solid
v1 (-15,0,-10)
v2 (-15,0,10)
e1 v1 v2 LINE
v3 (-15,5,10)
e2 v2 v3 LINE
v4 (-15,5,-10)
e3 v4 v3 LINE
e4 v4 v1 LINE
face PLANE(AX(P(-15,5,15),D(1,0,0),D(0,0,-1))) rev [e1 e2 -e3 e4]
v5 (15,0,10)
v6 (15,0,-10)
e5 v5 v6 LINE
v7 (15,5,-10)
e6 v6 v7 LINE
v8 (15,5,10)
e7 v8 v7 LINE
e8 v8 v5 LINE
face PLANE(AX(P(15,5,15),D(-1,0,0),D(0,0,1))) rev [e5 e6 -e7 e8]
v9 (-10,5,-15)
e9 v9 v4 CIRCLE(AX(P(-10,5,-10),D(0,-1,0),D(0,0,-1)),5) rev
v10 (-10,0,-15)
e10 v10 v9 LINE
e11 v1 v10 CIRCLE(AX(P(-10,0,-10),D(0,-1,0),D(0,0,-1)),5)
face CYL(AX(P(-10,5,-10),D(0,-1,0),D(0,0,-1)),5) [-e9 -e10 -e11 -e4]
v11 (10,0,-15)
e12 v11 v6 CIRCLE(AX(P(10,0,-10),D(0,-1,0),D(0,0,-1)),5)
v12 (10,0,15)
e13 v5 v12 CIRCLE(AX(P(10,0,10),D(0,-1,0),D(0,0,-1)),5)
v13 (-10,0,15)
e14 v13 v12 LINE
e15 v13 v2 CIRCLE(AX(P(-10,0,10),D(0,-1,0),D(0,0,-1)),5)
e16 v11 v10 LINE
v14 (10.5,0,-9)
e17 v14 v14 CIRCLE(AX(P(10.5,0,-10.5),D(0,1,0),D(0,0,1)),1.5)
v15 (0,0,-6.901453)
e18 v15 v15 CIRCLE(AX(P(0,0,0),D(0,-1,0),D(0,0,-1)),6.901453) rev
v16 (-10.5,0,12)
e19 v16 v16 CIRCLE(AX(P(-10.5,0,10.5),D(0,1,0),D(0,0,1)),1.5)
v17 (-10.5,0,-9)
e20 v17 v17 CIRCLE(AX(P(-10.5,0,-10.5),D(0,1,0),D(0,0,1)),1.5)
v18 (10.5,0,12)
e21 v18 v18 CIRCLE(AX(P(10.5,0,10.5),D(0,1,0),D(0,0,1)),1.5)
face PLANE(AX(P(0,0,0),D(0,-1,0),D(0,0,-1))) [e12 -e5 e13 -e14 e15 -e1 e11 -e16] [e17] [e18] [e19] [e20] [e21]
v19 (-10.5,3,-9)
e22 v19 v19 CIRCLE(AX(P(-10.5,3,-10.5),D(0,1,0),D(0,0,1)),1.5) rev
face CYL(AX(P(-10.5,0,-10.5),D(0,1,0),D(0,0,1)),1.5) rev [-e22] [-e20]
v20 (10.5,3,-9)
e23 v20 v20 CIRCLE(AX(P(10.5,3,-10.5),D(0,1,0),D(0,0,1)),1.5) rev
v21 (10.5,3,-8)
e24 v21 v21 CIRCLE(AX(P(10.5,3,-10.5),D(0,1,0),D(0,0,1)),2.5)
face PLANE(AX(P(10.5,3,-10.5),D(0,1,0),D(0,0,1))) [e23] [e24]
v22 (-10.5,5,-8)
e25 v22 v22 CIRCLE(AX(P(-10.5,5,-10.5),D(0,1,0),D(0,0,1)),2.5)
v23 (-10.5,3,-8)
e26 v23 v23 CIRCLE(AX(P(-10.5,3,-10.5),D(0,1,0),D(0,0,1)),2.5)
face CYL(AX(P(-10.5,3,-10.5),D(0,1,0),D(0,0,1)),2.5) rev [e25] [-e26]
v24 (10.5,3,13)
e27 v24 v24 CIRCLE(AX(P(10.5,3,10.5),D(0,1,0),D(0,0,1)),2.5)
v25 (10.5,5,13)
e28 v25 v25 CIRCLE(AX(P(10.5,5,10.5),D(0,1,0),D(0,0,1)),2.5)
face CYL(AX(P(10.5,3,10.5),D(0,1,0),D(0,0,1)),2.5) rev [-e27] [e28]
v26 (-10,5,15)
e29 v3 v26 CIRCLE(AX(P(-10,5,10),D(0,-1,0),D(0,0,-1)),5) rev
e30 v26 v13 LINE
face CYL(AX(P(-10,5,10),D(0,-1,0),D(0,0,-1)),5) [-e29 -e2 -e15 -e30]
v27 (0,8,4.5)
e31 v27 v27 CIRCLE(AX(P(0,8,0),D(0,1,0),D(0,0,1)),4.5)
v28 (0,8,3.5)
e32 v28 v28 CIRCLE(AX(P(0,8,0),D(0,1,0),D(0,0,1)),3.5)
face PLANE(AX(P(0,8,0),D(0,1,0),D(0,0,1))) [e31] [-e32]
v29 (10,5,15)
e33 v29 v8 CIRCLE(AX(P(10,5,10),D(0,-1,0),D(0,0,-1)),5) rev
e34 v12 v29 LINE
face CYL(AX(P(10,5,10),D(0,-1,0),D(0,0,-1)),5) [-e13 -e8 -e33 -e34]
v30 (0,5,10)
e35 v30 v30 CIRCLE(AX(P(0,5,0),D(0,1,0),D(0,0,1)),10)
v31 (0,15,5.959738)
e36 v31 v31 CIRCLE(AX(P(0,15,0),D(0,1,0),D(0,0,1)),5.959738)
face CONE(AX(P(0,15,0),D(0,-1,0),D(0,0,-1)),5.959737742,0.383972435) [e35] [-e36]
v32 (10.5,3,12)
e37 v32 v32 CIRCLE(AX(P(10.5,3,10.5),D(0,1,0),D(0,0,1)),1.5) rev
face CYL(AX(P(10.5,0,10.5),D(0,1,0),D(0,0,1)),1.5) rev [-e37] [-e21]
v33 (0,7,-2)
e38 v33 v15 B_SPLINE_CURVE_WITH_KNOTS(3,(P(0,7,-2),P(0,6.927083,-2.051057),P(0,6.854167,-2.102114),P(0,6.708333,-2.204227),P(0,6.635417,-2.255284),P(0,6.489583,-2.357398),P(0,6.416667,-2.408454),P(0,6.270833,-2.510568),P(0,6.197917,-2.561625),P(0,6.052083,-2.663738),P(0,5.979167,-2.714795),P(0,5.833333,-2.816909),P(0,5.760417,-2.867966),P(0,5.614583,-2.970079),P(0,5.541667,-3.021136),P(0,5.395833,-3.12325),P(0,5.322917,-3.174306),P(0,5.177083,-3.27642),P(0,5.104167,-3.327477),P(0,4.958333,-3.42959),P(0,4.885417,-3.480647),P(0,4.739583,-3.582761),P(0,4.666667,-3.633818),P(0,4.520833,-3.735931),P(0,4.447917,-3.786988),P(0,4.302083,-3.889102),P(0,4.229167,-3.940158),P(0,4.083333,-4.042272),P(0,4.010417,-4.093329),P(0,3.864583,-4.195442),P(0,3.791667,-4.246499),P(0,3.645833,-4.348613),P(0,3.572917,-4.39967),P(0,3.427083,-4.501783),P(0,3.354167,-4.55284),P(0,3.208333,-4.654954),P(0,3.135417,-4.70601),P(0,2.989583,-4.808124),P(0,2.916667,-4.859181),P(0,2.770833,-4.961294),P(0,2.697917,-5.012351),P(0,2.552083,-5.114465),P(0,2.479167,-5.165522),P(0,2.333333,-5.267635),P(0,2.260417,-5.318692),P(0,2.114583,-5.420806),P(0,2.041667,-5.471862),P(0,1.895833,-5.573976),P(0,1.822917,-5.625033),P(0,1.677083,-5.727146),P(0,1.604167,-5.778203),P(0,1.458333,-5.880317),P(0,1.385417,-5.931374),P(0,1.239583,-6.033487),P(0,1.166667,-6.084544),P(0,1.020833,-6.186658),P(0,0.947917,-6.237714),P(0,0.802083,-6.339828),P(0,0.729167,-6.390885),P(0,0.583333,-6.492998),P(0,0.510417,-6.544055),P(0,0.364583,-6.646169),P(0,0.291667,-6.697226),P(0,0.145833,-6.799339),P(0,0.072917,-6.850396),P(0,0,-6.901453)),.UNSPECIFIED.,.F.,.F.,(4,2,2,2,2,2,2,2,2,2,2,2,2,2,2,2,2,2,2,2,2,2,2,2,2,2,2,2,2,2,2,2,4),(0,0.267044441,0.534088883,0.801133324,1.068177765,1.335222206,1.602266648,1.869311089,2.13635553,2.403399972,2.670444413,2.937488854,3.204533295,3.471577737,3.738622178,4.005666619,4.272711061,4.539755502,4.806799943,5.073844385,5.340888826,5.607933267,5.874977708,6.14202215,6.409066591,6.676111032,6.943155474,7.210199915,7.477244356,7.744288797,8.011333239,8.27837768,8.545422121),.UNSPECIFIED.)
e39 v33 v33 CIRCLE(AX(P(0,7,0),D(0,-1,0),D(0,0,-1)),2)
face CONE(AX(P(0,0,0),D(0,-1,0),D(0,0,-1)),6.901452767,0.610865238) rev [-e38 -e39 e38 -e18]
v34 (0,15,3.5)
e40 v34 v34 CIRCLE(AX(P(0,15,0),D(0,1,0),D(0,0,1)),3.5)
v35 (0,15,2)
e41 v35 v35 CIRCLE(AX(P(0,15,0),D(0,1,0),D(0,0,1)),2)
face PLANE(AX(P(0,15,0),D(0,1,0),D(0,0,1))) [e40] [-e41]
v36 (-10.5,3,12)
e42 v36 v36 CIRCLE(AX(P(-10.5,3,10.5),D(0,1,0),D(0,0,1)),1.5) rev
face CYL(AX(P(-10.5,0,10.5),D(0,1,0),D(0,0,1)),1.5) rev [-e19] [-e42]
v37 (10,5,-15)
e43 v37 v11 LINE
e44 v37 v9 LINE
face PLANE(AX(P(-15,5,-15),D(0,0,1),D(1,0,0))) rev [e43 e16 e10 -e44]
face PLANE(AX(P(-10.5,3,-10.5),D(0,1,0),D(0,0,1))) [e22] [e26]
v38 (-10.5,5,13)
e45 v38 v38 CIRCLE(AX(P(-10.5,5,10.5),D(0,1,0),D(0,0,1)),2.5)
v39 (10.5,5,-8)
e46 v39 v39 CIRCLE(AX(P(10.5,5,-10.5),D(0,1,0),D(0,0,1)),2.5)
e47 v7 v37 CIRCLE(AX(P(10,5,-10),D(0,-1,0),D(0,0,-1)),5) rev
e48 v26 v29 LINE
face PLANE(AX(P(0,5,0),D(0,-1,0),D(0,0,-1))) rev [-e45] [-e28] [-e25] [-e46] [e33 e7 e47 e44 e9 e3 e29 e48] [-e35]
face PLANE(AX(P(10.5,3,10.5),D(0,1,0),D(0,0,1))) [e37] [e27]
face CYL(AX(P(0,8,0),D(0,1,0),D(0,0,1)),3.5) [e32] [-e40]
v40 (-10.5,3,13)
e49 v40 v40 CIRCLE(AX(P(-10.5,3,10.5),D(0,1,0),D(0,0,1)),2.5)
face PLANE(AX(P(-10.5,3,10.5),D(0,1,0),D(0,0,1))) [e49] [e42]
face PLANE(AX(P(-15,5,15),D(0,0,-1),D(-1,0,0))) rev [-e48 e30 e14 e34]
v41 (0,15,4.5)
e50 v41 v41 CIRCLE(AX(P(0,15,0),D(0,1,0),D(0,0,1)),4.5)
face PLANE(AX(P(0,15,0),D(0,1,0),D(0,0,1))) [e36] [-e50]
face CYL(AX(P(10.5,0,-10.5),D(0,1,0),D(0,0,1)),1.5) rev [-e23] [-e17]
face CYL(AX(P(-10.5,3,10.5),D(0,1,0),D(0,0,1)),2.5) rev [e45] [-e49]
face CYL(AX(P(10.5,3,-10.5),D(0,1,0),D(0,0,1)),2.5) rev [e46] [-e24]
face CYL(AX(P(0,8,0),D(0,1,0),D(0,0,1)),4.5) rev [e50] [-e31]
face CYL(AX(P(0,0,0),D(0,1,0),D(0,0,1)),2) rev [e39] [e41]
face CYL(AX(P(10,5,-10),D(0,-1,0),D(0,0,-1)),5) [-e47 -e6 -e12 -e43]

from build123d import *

# Parameters (mm, degrees)
SKETCH1_W               = 30
SKETCH1_H               = 30
BOSS_EXTRUDE1_DEPTH     = 5
SKETCH4_R               = 10
BOSS_EXTRUDE2_DEPTH     = 10
CUT_EXTRUDE3_DEPTH      = 26.980762114
CUT_EXTRUDE3_DEPTH_BACK = 26.980762114
SKETCH5_R               = 2
SKETCH6_R               = 4.5
SKETCH6_R_2             = 3.5
CUT_EXTRUDE4_DEPTH      = 7
CHAMFER1_SIZE           = 10
CHAMFER1_SIZE_2         = 4.040262258
CUT_EXTRUDE5_DEPTH      = 24.452078799
CUT_EXTRUDE5_DEPTH_BACK = 24.452078799
SKETCH8_R               = 1.5
SKETCH9_R               = 2.5
CUT_EXTRUDE6_DEPTH      = 2
FILLET1_R               = 5
CHAMFER2_SIZE           = 7
CHAMFER2_SIZE2          = 4.901452767


with BuildPart() as part:
    # Sketch1 → Boss-Extrude1 (new body)
    with BuildSketch(Plane(origin=(0, 0, 0), x_dir=(1, 0, 0), z_dir=(0, 1, 0))):
        Rectangle(SKETCH1_W, SKETCH1_H)
    extrude(amount=BOSS_EXTRUDE1_DEPTH)

    # Sketch4 → Boss-Extrude2 (add)
    with BuildSketch(Plane(origin=(0, 5, 0), x_dir=(1, 0, 0), z_dir=(0, 1, 0))):
        with Locations(Location((0, 0, 0), (0, 0, 270))):
            Circle(SKETCH4_R)
    extrude(amount=BOSS_EXTRUDE2_DEPTH)

    # Sketch5 → Cut-Extrude3 (cut, two sides: drawn at the far end of the back side and taken through both)
    with BuildSketch(Plane(origin=(0, 15, 0), x_dir=(1, 0, 0), z_dir=(0, 1, 0)).offset(-CUT_EXTRUDE3_DEPTH_BACK)):
        with Locations(Location((0, 0, 0), (0, 0, 270))):
            Circle(SKETCH5_R)
    extrude(amount=CUT_EXTRUDE3_DEPTH + CUT_EXTRUDE3_DEPTH_BACK, mode=Mode.SUBTRACT)

    # Sketch6 → Cut-Extrude4 (cut)
    with BuildSketch(Plane(origin=(0, 15, 0), x_dir=(1, 0, 0), z_dir=(0, 1, 0))):
        with Locations(Location((0, 0, 0), (0, 0, 270))):
            Circle(SKETCH6_R)
        with Locations(Location((0, 0, 0), (0, 0, 270))):
            Circle(SKETCH6_R_2, mode=Mode.SUBTRACT)
    extrude(amount=-CUT_EXTRUDE4_DEPTH, mode=Mode.SUBTRACT)

    # Chamfer1
    # the kernel refuses this chamfer: 10, 4.040262258 mm, written as the material it takes off along each edge
    with BuildSketch(Plane(origin=(0, 15, 0), x_dir=(0, 0, 1), z_dir=(-1, 0, 0))) as chamfer1_piece_1_section:
        Polygon((10, -CHAMFER1_SIZE), (10 - CHAMFER1_SIZE_2, 0), (10, 0), align=None)
    chamfer1_piece_1 = revolve(axis=Axis((0, 15, 0), (0, 1, 0)), mode=Mode.PRIVATE)
    chamfer1_piece_1 = split(chamfer1_piece_1, bisect_by=Plane(origin=(0, 5, -8.005876014), z_dir=(0, 1, 0)), keep=Keep.TOP, mode=Mode.PRIVATE)
    add(chamfer1_piece_1, mode=Mode.SUBTRACT)

    # Sketch8 → Cut-Extrude5 (cut, two sides: drawn at the far end of the back side and taken through both)
    with BuildSketch(Plane(origin=(0, 5, 0), x_dir=(1, 0, 0), z_dir=(0, 1, 0)).offset(-CUT_EXTRUDE5_DEPTH_BACK)):
        with Locations(Location((10.5, 10.5, 0), (0, 0, 270))):
            Circle(SKETCH8_R)
        with Locations(Location((10.5, -10.5, 0), (0, 0, 270))):
            Circle(SKETCH8_R)
        with Locations(Location((-10.5, -10.5, 0), (0, 0, 270))):
            Circle(SKETCH8_R)
        with Locations(Location((-10.5, 10.5, 0), (0, 0, 270))):
            Circle(SKETCH8_R)
    extrude(amount=CUT_EXTRUDE5_DEPTH + CUT_EXTRUDE5_DEPTH_BACK, mode=Mode.SUBTRACT)

    # Sketch9 → Cut-Extrude6 (cut)
    with BuildSketch(Plane(origin=(0, 5, 0), x_dir=(1, 0, 0), z_dir=(0, 1, 0))):
        with Locations(Location((-10.5, 10.5, 0), (0, 0, 270))):
            Circle(SKETCH9_R)
        with Locations(Location((10.5, 10.5, 0), (0, 0, 270))):
            Circle(SKETCH9_R)
        with Locations(Location((10.5, -10.5, 0), (0, 0, 270))):
            Circle(SKETCH9_R)
        with Locations(Location((-10.5, -10.5, 0), (0, 0, 270))):
            Circle(SKETCH9_R)
    extrude(amount=-CUT_EXTRUDE6_DEPTH, mode=Mode.SUBTRACT)

    # Fillet1
    fillet1_edges = [part.edges().sort_by_distance(p)[0] for p in [
        (15, 2.5, 15),
        (-15, 2.5, 15),
        (-15, 2.5, -15),
        (15, 2.5, -15),
    ]]
    fillet(fillet1_edges, radius=FILLET1_R)

    # Chamfer2
    chamfer2_edges = [part.edges().sort_by_distance(p)[0] for p in [
        (0, 0, -2),
    ]]
    chamfer2_side = [part.faces().sort_by_distance(p)[0] for p in [
        (0, 7.5, -2),
    ]]
    chamfer(chamfer2_edges, length=CHAMFER2_SIZE, length2=CHAMFER2_SIZE2, reference=chamfer2_side[0])


solid = part.part
